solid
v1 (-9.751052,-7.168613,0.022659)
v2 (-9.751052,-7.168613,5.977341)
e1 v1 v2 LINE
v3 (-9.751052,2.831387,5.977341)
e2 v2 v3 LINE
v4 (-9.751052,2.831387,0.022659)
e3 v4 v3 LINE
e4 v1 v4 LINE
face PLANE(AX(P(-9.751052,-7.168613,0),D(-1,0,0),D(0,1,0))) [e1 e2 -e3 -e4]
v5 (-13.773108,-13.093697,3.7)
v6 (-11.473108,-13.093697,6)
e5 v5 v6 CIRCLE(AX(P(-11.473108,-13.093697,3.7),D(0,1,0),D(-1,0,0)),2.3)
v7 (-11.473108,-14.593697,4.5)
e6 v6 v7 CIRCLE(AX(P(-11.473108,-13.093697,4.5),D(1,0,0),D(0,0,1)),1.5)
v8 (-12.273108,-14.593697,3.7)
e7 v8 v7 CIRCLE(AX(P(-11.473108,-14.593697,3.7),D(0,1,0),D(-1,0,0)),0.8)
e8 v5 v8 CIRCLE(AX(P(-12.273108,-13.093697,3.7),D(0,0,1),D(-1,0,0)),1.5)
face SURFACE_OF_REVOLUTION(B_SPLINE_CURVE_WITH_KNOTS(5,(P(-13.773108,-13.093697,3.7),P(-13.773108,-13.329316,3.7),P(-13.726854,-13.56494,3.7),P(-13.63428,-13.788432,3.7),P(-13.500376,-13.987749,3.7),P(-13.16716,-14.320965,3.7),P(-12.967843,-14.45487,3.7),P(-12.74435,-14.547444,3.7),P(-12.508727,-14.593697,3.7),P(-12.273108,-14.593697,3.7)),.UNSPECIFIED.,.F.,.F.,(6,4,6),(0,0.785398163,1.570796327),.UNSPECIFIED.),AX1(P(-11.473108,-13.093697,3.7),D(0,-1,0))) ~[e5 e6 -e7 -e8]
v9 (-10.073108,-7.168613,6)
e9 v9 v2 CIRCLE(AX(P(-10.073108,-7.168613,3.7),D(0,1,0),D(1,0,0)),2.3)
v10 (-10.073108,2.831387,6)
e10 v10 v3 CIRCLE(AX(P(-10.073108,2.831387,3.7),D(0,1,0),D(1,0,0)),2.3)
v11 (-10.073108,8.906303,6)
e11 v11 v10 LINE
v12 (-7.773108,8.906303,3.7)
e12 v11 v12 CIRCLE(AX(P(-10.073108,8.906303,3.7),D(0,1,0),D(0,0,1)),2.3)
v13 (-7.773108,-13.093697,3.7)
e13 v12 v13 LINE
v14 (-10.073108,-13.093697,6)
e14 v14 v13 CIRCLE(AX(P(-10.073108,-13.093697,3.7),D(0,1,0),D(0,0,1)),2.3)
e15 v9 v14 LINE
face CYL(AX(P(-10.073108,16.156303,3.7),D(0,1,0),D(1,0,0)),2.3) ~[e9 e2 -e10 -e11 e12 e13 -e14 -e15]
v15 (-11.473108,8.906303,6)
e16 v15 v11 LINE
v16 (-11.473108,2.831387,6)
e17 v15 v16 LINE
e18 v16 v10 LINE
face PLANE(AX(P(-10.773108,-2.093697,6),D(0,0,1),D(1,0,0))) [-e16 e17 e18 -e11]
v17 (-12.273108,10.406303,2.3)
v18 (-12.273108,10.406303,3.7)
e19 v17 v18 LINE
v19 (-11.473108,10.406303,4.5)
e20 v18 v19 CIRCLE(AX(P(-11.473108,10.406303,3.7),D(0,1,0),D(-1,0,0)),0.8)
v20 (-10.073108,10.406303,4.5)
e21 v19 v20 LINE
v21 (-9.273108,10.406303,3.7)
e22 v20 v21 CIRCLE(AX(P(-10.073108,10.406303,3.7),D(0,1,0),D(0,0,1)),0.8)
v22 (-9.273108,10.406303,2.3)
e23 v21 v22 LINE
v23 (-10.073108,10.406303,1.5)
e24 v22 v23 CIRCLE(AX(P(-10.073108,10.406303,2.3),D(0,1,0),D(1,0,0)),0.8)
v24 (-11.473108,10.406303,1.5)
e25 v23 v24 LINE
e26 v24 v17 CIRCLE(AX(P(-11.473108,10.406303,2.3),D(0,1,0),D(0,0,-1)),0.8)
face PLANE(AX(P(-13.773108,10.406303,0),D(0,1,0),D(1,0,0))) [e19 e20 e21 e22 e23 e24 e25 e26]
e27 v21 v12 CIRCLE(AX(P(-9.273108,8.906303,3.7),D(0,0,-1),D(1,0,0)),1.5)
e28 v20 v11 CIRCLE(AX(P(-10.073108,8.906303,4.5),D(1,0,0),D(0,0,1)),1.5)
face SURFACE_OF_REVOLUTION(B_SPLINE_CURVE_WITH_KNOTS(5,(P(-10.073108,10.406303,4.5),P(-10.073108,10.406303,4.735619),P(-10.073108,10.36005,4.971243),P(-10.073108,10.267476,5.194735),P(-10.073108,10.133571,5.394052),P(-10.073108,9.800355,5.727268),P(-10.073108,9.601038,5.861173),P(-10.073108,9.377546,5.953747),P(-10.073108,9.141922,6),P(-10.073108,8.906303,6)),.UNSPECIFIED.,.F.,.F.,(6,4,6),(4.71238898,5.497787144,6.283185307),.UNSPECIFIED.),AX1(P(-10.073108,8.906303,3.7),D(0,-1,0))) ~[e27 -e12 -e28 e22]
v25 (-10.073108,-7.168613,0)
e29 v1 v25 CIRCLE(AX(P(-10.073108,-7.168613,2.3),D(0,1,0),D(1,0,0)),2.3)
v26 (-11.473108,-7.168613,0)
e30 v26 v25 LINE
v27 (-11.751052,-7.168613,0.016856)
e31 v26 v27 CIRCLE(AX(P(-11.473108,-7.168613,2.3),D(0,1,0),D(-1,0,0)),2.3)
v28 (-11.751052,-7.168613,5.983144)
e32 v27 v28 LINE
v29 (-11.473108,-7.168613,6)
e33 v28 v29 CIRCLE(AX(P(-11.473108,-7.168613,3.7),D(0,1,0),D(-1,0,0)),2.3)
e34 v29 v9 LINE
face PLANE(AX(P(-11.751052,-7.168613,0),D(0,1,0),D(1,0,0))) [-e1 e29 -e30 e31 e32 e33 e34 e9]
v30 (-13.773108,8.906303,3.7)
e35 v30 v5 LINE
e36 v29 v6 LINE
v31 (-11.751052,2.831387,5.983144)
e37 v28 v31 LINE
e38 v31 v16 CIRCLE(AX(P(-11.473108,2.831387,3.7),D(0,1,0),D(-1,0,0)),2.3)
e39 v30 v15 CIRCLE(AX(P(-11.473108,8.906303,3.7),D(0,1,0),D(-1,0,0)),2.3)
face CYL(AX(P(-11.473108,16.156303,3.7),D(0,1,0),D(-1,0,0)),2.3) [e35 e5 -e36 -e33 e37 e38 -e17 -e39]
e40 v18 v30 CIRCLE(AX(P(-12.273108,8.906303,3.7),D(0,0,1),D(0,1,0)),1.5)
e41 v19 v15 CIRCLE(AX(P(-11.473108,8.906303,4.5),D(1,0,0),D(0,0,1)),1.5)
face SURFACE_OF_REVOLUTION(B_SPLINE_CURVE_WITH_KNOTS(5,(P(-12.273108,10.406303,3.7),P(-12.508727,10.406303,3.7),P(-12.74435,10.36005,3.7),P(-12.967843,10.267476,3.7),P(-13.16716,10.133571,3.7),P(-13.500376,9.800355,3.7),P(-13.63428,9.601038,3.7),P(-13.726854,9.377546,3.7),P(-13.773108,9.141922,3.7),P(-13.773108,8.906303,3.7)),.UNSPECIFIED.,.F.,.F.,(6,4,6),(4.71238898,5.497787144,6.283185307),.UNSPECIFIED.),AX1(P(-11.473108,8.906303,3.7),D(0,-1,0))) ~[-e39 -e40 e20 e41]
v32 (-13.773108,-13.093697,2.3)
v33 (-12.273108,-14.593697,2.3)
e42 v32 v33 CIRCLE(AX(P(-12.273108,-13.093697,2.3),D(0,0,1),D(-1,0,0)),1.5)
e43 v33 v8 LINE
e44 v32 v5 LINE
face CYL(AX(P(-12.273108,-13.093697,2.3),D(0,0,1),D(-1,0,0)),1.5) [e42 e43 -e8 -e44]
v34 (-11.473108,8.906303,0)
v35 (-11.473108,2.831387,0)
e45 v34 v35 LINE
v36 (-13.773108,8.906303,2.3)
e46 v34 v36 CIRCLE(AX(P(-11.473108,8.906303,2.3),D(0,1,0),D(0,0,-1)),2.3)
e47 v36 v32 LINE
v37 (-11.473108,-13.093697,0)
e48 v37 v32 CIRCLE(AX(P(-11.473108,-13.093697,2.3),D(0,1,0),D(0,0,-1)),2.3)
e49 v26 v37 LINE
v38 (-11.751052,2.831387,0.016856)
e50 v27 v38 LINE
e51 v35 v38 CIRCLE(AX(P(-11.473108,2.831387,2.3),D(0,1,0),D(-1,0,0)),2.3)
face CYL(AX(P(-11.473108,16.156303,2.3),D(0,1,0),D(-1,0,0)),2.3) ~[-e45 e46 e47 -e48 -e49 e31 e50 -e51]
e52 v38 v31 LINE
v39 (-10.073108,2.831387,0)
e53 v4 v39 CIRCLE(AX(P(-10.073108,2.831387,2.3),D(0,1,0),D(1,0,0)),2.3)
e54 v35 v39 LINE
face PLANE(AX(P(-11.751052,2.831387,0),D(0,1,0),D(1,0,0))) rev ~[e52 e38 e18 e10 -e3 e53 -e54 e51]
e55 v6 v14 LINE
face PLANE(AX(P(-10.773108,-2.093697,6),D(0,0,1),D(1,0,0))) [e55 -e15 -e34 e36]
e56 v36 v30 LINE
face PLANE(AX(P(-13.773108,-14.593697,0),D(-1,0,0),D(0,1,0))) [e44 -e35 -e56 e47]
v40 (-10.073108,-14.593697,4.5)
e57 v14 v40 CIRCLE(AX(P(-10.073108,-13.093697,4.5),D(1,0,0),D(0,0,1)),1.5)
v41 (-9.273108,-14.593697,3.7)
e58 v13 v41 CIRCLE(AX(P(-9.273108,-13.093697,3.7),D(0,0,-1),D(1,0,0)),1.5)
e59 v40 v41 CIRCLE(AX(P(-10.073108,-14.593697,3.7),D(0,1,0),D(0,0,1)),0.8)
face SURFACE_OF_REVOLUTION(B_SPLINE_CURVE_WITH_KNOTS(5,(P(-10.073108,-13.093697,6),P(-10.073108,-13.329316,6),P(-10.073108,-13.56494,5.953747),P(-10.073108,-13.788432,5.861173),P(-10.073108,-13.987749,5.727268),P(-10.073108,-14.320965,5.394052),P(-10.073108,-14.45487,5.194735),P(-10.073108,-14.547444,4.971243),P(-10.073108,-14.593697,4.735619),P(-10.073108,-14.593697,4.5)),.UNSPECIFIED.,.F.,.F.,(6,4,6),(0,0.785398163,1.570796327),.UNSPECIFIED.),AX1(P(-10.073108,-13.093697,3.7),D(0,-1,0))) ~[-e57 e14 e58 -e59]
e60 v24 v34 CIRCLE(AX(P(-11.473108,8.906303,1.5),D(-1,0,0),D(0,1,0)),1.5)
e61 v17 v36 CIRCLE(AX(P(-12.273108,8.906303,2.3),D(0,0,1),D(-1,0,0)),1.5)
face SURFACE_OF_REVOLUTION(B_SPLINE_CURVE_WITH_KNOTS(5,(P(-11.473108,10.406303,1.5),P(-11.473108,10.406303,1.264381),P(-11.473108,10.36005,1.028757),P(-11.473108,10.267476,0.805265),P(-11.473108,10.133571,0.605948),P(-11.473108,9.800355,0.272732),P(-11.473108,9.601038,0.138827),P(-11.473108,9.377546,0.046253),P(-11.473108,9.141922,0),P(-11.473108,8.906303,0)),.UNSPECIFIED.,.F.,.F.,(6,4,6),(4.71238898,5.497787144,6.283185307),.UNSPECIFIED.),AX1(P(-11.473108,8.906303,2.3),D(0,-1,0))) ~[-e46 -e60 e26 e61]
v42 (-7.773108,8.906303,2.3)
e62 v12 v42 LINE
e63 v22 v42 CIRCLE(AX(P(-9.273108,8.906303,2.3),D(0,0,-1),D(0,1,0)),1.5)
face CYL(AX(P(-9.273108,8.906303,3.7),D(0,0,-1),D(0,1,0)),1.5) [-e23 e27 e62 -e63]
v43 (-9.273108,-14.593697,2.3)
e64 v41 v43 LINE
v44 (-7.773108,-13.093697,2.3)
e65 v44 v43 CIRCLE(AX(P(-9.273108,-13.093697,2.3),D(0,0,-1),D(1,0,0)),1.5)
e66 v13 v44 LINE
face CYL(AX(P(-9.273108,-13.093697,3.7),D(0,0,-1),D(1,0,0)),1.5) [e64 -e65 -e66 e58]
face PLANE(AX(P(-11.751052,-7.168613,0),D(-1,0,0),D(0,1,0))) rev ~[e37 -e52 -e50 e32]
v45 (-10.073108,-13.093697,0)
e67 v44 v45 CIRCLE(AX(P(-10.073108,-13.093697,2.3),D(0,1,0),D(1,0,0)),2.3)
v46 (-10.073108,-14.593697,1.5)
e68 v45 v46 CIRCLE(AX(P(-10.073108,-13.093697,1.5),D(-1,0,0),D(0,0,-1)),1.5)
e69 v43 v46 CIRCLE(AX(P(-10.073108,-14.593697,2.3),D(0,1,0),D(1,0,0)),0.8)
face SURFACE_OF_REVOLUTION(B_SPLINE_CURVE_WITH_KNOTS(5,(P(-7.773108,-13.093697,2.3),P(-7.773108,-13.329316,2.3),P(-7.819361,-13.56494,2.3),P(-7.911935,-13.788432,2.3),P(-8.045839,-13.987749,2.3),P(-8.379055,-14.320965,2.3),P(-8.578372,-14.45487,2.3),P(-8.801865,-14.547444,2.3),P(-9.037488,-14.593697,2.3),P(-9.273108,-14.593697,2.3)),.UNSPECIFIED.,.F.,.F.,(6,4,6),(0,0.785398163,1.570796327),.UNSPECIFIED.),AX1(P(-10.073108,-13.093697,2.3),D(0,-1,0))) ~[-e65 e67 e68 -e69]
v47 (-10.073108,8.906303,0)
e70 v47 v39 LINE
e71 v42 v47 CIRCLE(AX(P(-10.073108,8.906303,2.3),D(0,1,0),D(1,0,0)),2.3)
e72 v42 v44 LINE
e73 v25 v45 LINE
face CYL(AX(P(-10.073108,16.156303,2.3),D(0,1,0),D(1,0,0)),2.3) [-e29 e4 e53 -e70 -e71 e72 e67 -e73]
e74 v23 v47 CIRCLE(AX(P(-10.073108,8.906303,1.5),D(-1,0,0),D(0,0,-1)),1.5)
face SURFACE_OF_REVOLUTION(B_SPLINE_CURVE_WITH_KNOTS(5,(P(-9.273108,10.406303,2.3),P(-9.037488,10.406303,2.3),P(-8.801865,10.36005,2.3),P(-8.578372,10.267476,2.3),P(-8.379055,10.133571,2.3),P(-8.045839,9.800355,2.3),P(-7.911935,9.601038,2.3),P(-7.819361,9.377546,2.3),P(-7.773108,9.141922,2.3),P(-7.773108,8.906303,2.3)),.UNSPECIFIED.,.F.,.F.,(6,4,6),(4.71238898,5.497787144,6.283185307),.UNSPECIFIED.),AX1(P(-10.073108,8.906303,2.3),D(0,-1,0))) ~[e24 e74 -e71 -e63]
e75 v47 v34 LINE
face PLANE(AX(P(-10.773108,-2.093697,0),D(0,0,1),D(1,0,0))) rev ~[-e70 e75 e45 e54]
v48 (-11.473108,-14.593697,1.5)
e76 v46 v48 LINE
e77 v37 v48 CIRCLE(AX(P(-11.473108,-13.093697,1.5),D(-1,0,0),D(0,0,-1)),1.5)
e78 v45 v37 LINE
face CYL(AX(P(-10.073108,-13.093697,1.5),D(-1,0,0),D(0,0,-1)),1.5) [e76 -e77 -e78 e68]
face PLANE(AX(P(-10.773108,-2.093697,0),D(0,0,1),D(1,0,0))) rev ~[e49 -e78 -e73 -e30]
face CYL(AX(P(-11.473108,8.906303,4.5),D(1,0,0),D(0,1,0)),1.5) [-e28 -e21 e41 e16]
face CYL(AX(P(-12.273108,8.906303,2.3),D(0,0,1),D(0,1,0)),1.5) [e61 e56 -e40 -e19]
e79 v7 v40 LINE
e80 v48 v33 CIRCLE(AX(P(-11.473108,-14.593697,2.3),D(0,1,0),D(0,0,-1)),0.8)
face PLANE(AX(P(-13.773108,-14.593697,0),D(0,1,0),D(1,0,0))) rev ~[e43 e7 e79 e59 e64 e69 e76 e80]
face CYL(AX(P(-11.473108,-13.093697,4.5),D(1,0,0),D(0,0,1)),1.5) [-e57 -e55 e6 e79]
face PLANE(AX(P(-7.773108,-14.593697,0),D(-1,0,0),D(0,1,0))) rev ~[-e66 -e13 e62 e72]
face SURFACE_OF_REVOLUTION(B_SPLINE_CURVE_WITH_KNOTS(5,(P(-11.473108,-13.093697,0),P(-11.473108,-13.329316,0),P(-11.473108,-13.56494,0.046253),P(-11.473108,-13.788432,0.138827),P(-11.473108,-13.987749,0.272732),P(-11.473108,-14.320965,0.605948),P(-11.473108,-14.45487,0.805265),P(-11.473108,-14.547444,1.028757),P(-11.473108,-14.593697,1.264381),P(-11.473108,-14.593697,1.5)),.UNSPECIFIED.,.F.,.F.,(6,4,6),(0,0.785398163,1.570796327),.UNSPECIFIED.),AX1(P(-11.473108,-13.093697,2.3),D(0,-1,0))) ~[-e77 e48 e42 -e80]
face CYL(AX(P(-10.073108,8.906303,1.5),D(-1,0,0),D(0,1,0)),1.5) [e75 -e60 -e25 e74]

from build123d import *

# Parameters (mm, degrees)
F0_W        = 6
F0_H        = 25
F0_W_2      = 2
F0_H_2      = 10
F1_DEPTH    = 6
F2_T1_DEPTH = 36.5
F3_R        = 1.5


# Not quite as in the source:
# - a fillet or chamfer that OpenCascade refuses, or shapes differently, is made with other operations: its cross-section is extruded or revolved along the edge and cut away or added


with BuildPart() as f1:
    # F0 (on Top) → F1 (new body)
    with BuildSketch(Plane.XY):
        with Locations((-10.7731075219, -2.0936969668)):
            Rectangle(F0_W, F0_H)
        with Locations((-10.7510519922, -2.1686129086)):
            Rectangle(F0_W_2, F0_H_2, mode=Mode.SUBTRACT)
    extrude(amount=F1_DEPTH)

    # F2: fillet of radius 2.3 on 4 edges, made by hand

    # F2_s2 → F2_t1 (cut)
    with BuildSketch(Plane.XZ.offset(-16.1563030332)):
        with BuildLine():
            ThreePointArc((-13.7731075219, 3.7), (-13.0994531186, 5.3263455967), (-11.4731075219, 6))
            Line((-11.4731075219, 6), (-13.7731075219, 6))
            Line((-13.7731075219, 6), (-13.7731075219, 3.7))
        make_face()
        with BuildLine():
            ThreePointArc((-13.7731075219, 2.3), (-13.0994531186, 0.6736544033), (-11.4731075219, 0))
            Line((-11.4731075219, 0), (-13.7731075219, 0))
            Line((-13.7731075219, 0), (-13.7731075219, 2.3))
        make_face()
        with BuildLine():
            ThreePointArc((-7.7731075219, 3.7), (-8.4467619252, 5.3263455967), (-10.0731075219, 6))
            Line((-10.0731075219, 6), (-7.7731075219, 6))
            Line((-7.7731075219, 6), (-7.7731075219, 3.7))
        make_face()
        with BuildLine():
            ThreePointArc((-7.7731075219, 2.3), (-8.4467619252, 0.6736544033), (-10.0731075219, 0))
            Line((-10.0731075219, 0), (-7.7731075219, 0))
            Line((-7.7731075219, 0), (-7.7731075219, 2.3))
        make_face()
    extrude(amount=F2_T1_DEPTH, mode=Mode.SUBTRACT)

    # F3
    f3_edges = [f1.edges().sort_by_distance(p)[0] for p in [
        (-8.446762, 10.406303, 5.326346),
        (-10.773108, 10.406303, 6),
        (-13.099453, 10.406303, 5.326346),
        (-13.773108, 10.406303, 3),
        (-13.099453, 10.406303, 0.673654),
        (-8.446762, 10.406303, 0.673654),
        (-7.773108, 10.406303, 3),
        (-10.773108, 10.406303, 0),
        (-13.099453, -14.593697, 0.673654),
    ]]
    fillet(f3_edges, radius=F3_R)


solid = f1.part
